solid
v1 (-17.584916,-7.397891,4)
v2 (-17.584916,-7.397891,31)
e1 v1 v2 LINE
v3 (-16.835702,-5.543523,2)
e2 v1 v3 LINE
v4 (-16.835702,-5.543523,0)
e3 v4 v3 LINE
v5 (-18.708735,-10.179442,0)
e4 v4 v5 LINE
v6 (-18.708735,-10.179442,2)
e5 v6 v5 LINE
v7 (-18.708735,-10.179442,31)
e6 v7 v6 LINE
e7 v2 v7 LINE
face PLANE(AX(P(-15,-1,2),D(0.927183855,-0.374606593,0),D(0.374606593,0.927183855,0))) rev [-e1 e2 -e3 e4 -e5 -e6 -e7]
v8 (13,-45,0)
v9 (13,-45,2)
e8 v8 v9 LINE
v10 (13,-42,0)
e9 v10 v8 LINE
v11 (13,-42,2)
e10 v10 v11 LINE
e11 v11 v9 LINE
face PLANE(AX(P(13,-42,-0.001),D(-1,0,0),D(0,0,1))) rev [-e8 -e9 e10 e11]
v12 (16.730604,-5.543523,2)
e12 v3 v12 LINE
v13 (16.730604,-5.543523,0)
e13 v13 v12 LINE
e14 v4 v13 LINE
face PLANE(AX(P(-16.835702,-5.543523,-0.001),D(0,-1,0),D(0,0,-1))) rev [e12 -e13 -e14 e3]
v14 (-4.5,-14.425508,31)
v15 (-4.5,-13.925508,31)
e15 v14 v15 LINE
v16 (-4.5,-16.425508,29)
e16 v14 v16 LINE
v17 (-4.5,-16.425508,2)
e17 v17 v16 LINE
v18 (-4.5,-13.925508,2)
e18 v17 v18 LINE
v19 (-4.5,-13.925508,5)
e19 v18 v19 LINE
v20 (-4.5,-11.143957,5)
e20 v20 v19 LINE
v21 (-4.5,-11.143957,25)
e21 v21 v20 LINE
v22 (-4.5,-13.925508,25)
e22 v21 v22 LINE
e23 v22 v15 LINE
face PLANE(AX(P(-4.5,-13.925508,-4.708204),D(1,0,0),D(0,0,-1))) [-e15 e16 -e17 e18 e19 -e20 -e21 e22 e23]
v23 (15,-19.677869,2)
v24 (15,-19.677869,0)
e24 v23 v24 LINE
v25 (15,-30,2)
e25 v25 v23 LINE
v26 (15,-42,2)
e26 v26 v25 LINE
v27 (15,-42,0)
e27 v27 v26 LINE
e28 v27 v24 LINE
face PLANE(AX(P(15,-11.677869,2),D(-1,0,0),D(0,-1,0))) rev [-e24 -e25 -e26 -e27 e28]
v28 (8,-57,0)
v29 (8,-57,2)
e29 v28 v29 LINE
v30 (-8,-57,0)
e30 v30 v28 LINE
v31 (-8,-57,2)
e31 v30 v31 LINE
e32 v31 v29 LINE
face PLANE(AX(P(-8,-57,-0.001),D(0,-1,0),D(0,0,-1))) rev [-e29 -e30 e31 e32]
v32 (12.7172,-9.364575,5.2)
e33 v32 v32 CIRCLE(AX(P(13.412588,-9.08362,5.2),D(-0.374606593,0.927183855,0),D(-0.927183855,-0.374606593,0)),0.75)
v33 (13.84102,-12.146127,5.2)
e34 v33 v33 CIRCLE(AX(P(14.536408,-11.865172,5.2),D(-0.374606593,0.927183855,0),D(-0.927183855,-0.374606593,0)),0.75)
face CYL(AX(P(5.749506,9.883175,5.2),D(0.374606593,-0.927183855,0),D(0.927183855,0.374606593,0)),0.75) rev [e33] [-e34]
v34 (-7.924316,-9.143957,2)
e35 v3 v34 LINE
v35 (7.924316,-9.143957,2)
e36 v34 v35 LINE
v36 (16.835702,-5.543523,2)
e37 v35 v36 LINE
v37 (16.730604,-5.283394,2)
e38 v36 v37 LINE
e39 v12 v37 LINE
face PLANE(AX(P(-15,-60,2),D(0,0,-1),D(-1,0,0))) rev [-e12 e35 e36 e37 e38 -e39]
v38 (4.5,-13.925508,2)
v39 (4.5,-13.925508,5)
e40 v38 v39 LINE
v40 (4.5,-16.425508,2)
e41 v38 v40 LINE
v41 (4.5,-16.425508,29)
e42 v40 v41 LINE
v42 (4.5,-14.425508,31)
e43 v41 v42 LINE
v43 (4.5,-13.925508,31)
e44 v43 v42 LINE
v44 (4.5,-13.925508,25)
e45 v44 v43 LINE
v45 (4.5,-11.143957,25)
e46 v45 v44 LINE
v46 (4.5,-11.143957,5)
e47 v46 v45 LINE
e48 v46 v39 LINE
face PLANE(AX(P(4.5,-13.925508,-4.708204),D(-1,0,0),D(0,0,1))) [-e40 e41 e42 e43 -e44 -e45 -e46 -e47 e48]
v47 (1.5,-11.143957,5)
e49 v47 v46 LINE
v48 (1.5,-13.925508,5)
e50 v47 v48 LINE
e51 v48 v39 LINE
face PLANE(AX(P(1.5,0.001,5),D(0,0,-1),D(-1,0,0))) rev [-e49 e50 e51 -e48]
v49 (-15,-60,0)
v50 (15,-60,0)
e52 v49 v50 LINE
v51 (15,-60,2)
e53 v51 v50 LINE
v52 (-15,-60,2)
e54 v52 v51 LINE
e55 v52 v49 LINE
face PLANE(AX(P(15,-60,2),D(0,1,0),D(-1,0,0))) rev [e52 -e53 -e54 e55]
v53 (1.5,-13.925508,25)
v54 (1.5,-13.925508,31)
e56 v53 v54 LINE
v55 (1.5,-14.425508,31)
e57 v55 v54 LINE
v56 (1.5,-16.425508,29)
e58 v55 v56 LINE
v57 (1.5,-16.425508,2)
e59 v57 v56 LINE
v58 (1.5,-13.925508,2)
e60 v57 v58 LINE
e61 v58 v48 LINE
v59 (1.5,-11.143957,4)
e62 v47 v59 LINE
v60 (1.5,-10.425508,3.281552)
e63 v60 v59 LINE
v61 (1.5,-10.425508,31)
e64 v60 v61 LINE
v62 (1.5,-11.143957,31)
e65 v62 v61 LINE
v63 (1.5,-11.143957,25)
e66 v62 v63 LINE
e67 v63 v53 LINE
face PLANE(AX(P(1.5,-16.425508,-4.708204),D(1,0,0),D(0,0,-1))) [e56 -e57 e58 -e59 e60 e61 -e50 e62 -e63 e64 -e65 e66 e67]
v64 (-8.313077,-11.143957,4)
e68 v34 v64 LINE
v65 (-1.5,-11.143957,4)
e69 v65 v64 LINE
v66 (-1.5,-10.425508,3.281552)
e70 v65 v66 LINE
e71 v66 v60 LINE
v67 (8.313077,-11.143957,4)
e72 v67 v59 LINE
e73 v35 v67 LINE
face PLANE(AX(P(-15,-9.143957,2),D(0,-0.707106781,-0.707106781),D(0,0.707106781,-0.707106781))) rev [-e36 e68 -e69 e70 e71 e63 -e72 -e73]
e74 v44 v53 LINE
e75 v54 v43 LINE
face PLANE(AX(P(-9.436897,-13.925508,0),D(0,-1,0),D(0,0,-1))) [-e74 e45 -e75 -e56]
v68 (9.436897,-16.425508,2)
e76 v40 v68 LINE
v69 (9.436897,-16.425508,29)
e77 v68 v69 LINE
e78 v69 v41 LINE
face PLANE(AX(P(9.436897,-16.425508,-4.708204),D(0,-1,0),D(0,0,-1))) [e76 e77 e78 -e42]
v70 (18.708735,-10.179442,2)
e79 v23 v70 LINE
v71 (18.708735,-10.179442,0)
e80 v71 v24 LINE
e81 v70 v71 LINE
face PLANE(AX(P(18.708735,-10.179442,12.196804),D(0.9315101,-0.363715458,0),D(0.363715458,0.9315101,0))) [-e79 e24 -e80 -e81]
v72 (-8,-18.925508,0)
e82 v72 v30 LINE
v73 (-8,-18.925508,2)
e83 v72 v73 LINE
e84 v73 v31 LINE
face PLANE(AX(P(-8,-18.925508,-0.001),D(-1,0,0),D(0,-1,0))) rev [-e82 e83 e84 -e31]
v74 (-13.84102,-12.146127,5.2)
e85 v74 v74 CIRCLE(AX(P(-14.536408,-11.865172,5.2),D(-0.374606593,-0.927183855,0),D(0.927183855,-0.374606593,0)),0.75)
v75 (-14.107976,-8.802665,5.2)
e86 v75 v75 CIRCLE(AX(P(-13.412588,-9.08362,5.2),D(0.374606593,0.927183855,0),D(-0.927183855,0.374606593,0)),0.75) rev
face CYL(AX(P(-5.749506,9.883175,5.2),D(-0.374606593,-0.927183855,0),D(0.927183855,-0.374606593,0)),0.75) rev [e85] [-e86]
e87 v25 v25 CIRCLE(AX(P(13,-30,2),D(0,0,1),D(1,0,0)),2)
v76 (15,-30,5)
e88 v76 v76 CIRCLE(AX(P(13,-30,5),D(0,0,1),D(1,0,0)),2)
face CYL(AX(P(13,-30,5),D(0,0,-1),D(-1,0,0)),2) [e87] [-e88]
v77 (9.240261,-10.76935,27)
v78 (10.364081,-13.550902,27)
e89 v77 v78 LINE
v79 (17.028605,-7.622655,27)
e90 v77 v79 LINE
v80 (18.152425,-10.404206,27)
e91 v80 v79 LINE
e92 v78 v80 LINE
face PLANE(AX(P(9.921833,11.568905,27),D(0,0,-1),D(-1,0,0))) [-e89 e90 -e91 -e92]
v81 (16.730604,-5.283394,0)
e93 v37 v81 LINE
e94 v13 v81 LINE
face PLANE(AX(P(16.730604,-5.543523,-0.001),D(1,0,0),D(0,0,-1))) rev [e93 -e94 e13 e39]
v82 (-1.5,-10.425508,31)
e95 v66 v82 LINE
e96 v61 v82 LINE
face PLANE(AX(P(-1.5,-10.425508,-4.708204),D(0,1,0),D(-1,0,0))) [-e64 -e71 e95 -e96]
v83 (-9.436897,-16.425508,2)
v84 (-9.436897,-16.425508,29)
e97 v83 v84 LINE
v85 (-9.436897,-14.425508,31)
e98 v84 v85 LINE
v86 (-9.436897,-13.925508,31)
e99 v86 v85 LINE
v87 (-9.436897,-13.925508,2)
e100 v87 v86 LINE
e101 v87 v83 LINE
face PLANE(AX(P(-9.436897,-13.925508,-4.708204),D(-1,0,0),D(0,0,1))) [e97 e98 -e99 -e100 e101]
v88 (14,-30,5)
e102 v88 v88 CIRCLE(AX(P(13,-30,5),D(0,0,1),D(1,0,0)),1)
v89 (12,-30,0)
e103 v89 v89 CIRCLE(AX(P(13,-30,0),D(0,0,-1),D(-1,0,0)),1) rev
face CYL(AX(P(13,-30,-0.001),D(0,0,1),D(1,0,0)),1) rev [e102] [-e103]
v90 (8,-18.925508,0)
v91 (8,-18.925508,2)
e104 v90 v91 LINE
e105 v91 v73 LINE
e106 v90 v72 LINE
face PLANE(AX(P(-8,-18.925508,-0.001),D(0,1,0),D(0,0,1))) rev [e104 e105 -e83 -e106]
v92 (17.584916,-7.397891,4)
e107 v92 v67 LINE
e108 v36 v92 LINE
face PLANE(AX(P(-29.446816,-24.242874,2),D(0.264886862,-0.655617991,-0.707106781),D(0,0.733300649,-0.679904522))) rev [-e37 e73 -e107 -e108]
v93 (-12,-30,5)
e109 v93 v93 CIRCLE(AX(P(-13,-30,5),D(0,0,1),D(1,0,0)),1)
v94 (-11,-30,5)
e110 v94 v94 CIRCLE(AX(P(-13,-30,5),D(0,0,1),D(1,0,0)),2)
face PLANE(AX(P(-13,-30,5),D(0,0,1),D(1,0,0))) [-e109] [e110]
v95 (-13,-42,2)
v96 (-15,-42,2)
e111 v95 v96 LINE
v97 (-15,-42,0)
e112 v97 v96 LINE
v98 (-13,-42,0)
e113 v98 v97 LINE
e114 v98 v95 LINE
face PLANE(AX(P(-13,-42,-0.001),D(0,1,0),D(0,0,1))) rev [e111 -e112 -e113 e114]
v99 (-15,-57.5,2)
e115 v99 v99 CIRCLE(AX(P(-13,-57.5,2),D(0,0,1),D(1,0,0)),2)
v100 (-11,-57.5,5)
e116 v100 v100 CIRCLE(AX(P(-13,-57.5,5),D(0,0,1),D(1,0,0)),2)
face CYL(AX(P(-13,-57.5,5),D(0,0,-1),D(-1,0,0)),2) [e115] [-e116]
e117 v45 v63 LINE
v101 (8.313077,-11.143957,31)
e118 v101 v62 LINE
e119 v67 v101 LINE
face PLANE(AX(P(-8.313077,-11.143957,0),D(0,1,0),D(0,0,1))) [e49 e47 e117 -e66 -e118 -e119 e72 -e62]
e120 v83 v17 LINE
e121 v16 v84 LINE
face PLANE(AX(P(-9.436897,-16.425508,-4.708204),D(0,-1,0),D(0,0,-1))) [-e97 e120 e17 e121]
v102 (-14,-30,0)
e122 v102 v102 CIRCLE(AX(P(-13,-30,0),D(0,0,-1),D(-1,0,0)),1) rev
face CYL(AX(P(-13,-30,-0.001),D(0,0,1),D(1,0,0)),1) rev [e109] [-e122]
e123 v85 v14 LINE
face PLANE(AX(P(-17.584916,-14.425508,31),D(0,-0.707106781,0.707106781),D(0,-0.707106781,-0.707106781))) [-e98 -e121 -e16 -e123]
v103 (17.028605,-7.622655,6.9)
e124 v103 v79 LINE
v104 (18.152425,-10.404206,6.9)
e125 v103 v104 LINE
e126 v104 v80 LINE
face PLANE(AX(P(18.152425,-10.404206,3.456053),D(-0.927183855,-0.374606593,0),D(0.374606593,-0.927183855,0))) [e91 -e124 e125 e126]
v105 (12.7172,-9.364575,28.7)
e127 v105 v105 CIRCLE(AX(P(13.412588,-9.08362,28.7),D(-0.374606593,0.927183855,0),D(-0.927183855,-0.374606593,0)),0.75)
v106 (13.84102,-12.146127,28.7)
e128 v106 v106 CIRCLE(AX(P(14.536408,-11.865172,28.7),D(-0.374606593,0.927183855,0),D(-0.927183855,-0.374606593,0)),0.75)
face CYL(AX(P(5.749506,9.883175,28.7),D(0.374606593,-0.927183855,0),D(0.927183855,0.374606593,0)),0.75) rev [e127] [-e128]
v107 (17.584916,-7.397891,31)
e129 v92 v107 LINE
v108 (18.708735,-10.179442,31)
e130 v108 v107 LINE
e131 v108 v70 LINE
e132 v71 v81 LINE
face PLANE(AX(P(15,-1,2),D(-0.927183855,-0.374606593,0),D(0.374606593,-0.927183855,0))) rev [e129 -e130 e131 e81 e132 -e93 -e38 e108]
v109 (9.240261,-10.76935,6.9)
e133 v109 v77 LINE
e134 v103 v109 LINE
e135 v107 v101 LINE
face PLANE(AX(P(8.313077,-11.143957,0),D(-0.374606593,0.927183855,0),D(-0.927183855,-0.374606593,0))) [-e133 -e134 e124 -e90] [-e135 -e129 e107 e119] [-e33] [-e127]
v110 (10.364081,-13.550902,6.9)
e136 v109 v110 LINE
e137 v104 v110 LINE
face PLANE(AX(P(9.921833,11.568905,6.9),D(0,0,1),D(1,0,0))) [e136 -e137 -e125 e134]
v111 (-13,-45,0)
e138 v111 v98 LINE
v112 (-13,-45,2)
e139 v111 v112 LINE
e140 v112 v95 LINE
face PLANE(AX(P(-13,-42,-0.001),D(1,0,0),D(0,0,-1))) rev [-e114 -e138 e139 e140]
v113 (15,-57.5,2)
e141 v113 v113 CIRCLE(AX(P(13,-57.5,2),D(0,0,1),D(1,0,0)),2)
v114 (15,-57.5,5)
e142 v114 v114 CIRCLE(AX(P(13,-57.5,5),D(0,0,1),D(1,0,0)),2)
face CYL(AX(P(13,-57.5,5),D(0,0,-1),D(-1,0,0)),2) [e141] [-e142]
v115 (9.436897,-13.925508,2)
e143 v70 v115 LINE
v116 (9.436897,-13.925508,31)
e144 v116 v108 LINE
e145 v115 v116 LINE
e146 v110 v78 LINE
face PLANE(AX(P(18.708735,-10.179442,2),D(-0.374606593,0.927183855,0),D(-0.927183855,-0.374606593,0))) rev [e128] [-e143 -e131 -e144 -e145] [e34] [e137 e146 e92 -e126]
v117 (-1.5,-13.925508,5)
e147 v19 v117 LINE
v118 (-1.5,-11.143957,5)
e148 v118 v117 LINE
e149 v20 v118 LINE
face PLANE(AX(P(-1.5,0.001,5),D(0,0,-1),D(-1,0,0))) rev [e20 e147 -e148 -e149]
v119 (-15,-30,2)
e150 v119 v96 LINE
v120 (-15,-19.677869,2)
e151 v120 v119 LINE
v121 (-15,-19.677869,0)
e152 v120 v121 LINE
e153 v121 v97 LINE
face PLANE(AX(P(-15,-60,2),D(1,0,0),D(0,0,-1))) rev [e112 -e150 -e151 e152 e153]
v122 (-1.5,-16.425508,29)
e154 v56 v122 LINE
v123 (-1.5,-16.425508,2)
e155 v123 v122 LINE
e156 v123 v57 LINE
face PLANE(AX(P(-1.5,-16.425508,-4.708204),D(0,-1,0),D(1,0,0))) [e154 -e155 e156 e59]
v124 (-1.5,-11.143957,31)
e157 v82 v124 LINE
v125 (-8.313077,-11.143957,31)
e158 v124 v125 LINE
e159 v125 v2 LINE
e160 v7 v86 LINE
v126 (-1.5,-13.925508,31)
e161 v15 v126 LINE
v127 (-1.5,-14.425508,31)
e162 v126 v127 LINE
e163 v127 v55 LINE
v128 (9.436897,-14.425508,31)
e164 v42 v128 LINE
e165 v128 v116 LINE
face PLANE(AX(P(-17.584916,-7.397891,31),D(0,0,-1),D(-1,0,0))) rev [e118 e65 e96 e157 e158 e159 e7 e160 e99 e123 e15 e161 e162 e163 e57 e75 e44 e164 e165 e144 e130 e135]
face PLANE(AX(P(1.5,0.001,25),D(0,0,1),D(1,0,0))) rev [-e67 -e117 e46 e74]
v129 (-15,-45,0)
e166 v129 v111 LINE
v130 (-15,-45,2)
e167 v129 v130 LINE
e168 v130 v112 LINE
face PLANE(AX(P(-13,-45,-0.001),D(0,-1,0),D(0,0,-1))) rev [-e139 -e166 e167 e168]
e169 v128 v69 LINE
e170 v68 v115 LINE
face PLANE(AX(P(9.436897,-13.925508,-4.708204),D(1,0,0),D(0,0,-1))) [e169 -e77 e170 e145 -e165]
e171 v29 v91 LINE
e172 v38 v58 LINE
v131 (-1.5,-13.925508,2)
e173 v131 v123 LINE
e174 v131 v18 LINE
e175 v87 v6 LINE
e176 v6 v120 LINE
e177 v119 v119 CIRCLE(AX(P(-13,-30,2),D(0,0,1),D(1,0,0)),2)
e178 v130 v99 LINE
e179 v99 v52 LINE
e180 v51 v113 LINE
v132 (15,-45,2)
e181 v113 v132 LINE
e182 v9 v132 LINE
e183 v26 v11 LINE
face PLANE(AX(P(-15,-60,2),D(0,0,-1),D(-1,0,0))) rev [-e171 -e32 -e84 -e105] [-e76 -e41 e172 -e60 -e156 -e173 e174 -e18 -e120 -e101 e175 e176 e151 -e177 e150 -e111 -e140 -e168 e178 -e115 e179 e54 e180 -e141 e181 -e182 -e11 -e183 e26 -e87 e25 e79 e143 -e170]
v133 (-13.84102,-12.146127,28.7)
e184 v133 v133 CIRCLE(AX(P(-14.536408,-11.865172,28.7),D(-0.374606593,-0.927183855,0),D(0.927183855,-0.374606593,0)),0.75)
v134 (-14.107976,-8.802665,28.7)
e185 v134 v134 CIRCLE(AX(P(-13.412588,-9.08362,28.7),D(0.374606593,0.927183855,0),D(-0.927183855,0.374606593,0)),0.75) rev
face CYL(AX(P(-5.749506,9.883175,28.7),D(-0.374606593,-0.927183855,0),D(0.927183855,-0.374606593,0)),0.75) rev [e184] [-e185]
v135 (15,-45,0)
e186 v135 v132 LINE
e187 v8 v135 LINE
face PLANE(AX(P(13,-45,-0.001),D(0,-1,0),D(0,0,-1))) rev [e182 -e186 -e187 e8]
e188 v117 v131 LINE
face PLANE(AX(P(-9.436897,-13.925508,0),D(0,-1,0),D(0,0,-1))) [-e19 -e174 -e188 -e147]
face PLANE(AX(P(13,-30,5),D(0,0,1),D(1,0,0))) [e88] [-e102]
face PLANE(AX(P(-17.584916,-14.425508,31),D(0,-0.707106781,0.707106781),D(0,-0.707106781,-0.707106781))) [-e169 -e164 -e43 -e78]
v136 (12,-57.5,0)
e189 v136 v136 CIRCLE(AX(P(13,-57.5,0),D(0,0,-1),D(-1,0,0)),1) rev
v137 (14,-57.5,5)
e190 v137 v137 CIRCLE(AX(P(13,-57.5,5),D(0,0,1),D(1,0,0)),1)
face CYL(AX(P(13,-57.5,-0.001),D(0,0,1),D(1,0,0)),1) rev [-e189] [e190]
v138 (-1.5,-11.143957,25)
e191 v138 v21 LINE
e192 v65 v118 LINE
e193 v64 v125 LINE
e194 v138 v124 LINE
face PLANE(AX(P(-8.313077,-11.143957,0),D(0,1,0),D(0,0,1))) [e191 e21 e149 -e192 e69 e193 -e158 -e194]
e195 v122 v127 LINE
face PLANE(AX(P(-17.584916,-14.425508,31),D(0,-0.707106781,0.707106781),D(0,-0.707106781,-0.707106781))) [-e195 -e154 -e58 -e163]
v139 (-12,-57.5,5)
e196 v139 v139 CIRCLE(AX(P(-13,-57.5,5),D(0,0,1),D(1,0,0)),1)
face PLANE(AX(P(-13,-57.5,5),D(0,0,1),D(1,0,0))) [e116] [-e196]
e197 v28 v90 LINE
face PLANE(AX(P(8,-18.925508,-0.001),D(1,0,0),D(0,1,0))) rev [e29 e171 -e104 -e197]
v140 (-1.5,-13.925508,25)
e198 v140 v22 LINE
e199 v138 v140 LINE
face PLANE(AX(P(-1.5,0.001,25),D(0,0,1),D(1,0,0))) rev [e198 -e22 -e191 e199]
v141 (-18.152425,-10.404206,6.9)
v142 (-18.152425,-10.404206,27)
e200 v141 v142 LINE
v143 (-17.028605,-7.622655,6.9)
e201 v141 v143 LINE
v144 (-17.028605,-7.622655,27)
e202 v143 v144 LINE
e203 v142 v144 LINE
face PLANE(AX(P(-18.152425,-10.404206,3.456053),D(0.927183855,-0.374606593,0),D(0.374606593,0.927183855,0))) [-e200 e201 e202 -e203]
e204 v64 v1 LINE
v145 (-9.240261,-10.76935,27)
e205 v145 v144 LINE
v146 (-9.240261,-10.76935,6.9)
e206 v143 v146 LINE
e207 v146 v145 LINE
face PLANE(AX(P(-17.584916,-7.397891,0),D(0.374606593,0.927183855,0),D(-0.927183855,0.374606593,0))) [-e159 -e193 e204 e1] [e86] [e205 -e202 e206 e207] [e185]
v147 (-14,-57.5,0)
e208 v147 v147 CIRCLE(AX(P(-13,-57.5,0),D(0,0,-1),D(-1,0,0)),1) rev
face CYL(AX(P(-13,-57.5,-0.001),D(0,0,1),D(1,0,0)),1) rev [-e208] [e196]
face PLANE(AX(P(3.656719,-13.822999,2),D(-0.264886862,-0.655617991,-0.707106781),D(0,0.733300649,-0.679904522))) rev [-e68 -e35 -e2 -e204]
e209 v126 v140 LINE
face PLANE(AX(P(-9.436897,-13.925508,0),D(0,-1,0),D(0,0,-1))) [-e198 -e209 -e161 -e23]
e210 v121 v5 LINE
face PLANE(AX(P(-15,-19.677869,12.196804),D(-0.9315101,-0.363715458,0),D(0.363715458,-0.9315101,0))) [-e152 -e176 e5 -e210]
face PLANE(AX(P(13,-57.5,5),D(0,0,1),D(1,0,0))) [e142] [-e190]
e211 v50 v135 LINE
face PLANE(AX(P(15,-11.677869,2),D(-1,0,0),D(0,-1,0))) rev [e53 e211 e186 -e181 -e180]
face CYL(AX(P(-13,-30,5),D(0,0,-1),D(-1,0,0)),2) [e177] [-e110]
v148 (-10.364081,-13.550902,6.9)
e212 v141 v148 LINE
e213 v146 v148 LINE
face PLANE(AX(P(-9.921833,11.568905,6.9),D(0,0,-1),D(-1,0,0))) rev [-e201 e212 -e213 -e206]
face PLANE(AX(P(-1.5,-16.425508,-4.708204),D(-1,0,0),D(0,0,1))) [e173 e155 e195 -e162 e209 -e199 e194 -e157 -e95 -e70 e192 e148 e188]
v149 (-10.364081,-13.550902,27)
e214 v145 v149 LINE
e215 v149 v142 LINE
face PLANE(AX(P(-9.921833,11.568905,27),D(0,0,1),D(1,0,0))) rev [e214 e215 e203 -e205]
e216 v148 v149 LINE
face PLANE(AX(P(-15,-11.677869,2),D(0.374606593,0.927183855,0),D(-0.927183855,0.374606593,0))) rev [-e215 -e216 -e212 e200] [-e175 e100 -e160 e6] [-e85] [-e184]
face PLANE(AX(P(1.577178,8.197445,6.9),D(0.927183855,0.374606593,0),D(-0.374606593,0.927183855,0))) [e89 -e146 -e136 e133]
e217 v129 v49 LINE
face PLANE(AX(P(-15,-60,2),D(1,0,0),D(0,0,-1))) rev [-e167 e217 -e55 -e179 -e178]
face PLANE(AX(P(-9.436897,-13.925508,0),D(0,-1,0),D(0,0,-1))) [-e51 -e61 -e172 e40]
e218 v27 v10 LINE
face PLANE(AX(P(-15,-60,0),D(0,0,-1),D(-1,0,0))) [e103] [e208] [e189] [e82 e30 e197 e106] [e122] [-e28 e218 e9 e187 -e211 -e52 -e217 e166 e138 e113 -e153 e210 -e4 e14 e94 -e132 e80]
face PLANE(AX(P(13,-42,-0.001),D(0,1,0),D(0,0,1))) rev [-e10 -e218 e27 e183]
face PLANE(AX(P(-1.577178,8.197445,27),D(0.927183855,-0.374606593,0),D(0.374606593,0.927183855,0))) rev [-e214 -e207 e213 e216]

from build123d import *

# Parameters (mm, degrees)
EXTRUDE_1_DEPTH      = 2
EXTRUDE_2_DEPTH      = 29
EXTRUDE_2_DEPTH_BACK = 2
CUT_EXTRUDE_5_REACH  = 60.965
SKETCH_3_R           = 0.75
SKETCH_3_W           = 9
SKETCH_3_H           = 20.1
CUT_EXTRUDE_7_REACH  = 61.851
SKETCH_12_R          = 0.75
SKETCH_12_W          = 9
SKETCH_12_H          = 20.1
CUT_EXTRUDE_8_REACH  = 71.217
SKETCH_13_R          = 1
SKETCH_13_W          = 16
SKETCH_13_H          = 38.074491789
SKETCH_13_W_2        = 2
SKETCH_13_H_2        = 3
CHAMFER_4_SIZE       = 1
CHAMFER_5_SIZE       = 2
EXTRUDE_START        = -29
SKETCH_14_W          = 3
SKETCH_14_H          = 6
SKETCH_14_W_2        = 4.936896873
SKETCH_14_H_2        = 2.5
EXTRUDE_8_DEPTH      = 29
CHAMFER_6_SIZE       = 2
EXTRUDE_START_2      = 3
SKETCH_15_R          = 2
SKETCH_15_R_2        = 1
EXTRUDE_9_DEPTH      = 3
CUT_EXTRUDE_9_REACH  = 60.599
SKETCH_16_W          = 3
SKETCH_16_H          = 20
EXTRUDE_10_DEPTH     = 2
EXTRUDE_11_DEPTH     = 24.1
CUT_EXTRUDE_11_REACH = 71.217
SKETCH_20_W          = 33.566306147
SKETCH_20_H          = 6.687524296


with BuildPart() as part:
    # 草圖1 → 填料-伸長1 (new body)
    with BuildSketch(Plane.XY):
        Polygon((-15, 0), (15, 0), (15, -1), (18.708735418, -10.179442277), (15, -11.67786865), (15, -60), (-15, -60), (-15, -11.67786865), (-18.708735418, -10.179442277), (-15, -1), align=None)
    extrude(amount=EXTRUDE_1_DEPTH)

    # 草圖2 → 填料-伸長2 (add, two sides: drawn at the far end of the back side and taken through both)
    with BuildSketch(Plane.XY.offset(2).offset(-EXTRUDE_2_DEPTH_BACK)):
        Polygon((-18.708735418, -10.179442277), (-9.436896873, -13.925508211), (9.436896873, -13.925508211), (18.708735418, -10.179442277), (17.584915638, -7.397890713), (8.313077092, -11.143956647), (-8.313077092, -11.143956647), (-17.584915638, -7.397890713), align=None)
    extrude(amount=EXTRUDE_2_DEPTH + EXTRUDE_2_DEPTH_BACK)

    # 草圖3 → 除料-伸長5 (cut, up to next)
    with BuildSketch(Plane(origin=(4.914686172, -15.752599933, 0), x_dir=(0.9271838545667884, 0.37460659341590963, 0), z_dir=(-0.37460659341590963, 0.9271838545667884, 0)), mode=Mode.PRIVATE) as cut_extrude_5_sk1:
        with Locations(Location((10.377361354, -5.2, 0), (0, 0, 180))):
            Circle(SKETCH_3_R)
    cut_extrude_5_tool1 = extrude(cut_extrude_5_sk1.sketch, amount=CUT_EXTRUDE_5_REACH, mode=Mode.PRIVATE) & part.part
    # 草圖3 → 除料-伸長5 (cut, up to next)
    with BuildSketch(Plane(origin=(4.914686172, -15.752599933, 0), x_dir=(0.9271838545667884, 0.37460659341590963, 0), z_dir=(-0.37460659341590963, 0.9271838545667884, 0)), mode=Mode.PRIVATE) as cut_extrude_5_sk2:
        with Locations(Location((10.377361354, -28.7, 0), (0, 0, 180))):
            Circle(SKETCH_3_R)
    cut_extrude_5_tool2 = extrude(cut_extrude_5_sk2.sketch, amount=CUT_EXTRUDE_5_REACH, mode=Mode.PRIVATE) & part.part
    # 草圖3 → 除料-伸長5 (cut, up to next)
    with BuildSketch(Plane(origin=(4.914686172, -15.752599933, 0), x_dir=(0.9271838545667884, 0.37460659341590963, 0), z_dir=(-0.37460659341590963, 0.9271838545667884, 0)), mode=Mode.PRIVATE) as cut_extrude_5_sk3:
        with Locations((10.377361354, -16.95)):
            Rectangle(SKETCH_3_W, SKETCH_3_H)
    cut_extrude_5_tool3 = extrude(cut_extrude_5_sk3.sketch, amount=CUT_EXTRUDE_5_REACH, mode=Mode.PRIVATE) & part.part
    add(cut_extrude_5_tool1.solids().sort_by_distance((14.536408, -11.865172, 5.2))[0], mode=Mode.SUBTRACT)
    add(cut_extrude_5_tool2.solids().sort_by_distance((14.536408, -11.865172, 28.7))[0], mode=Mode.SUBTRACT)
    add(cut_extrude_5_tool3.solids().sort_by_distance((14.536408, -11.865172, 16.95))[0], mode=Mode.SUBTRACT)

    # 草圖12 → 除料-伸長7 (cut, up to next)
    with BuildSketch(Plane(origin=(-6.161016101, -15.249049955, 0), x_dir=(0.9271838545667846, -0.3746065934159192, 0), z_dir=(-0.3746065934159192, -0.9271838545667846, 0)), mode=Mode.PRIVATE) as cut_extrude_7_sk1:
        with Locations((-9.033151225, 28.7)):
            Circle(SKETCH_12_R)
    cut_extrude_7_tool1 = extrude(cut_extrude_7_sk1.sketch, amount=-CUT_EXTRUDE_7_REACH, mode=Mode.PRIVATE) & part.part
    # 草圖12 → 除料-伸長7 (cut, up to next)
    with BuildSketch(Plane(origin=(-6.161016101, -15.249049955, 0), x_dir=(0.9271838545667846, -0.3746065934159192, 0), z_dir=(-0.3746065934159192, -0.9271838545667846, 0)), mode=Mode.PRIVATE) as cut_extrude_7_sk2:
        with Locations((-9.033151225, 5.2)):
            Circle(SKETCH_12_R)
    cut_extrude_7_tool2 = extrude(cut_extrude_7_sk2.sketch, amount=-CUT_EXTRUDE_7_REACH, mode=Mode.PRIVATE) & part.part
    # 草圖12 → 除料-伸長7 (cut, up to next)
    with BuildSketch(Plane(origin=(-6.161016101, -15.249049955, 0), x_dir=(0.9271838545667846, -0.3746065934159192, 0), z_dir=(-0.3746065934159192, -0.9271838545667846, 0)), mode=Mode.PRIVATE) as cut_extrude_7_sk3:
        with Locations((-9.033151225, 16.95)):
            Rectangle(SKETCH_12_W, SKETCH_12_H)
    cut_extrude_7_tool3 = extrude(cut_extrude_7_sk3.sketch, amount=-CUT_EXTRUDE_7_REACH, mode=Mode.PRIVATE) & part.part
    add(cut_extrude_7_tool1.solids().sort_by_distance((-14.536408, -11.865172, 28.7))[0], mode=Mode.SUBTRACT)
    add(cut_extrude_7_tool2.solids().sort_by_distance((-14.536408, -11.865172, 5.2))[0], mode=Mode.SUBTRACT)
    add(cut_extrude_7_tool3.solids().sort_by_distance((-14.536408, -11.865172, 16.95))[0], mode=Mode.SUBTRACT)

    # 草圖13 → 除料-伸長8 (cut, up to next)
    with BuildSketch(Plane.XY.offset(2), mode=Mode.PRIVATE) as cut_extrude_8_sk1:
        with Locations((-13, -30)):
            Circle(SKETCH_13_R)
    cut_extrude_8_tool1 = extrude(cut_extrude_8_sk1.sketch, amount=-CUT_EXTRUDE_8_REACH, mode=Mode.PRIVATE) & part.part
    # 草圖13 → 除料-伸長8 (cut, up to next)
    with BuildSketch(Plane.XY.offset(2), mode=Mode.PRIVATE) as cut_extrude_8_sk2:
        with Locations((13, -30)):
            Circle(SKETCH_13_R)
    cut_extrude_8_tool2 = extrude(cut_extrude_8_sk2.sketch, amount=-CUT_EXTRUDE_8_REACH, mode=Mode.PRIVATE) & part.part
    # 草圖13 → 除料-伸長8 (cut, up to next)
    with BuildSketch(Plane.XY.offset(2), mode=Mode.PRIVATE) as cut_extrude_8_sk3:
        with Locations((-13, -57.5)):
            Circle(SKETCH_13_R)
    cut_extrude_8_tool3 = extrude(cut_extrude_8_sk3.sketch, amount=-CUT_EXTRUDE_8_REACH, mode=Mode.PRIVATE) & part.part
    # 草圖13 → 除料-伸長8 (cut, up to next)
    with BuildSketch(Plane.XY.offset(2), mode=Mode.PRIVATE) as cut_extrude_8_sk4:
        with Locations((13, -57.5)):
            Circle(SKETCH_13_R)
    cut_extrude_8_tool4 = extrude(cut_extrude_8_sk4.sketch, amount=-CUT_EXTRUDE_8_REACH, mode=Mode.PRIVATE) & part.part
    # 草圖13 → 除料-伸長8 (cut, up to next)
    with BuildSketch(Plane.XY.offset(2), mode=Mode.PRIVATE) as cut_extrude_8_sk5:
        with Locations((0, -37.962754105)):
            Rectangle(SKETCH_13_W, SKETCH_13_H)
    cut_extrude_8_tool5 = extrude(cut_extrude_8_sk5.sketch, amount=-CUT_EXTRUDE_8_REACH, mode=Mode.PRIVATE) & part.part
    # 草圖13 → 除料-伸長8 (cut, up to next)
    with BuildSketch(Plane.XY.offset(2), mode=Mode.PRIVATE) as cut_extrude_8_sk6:
        with Locations((-14, -43.5)):
            Rectangle(SKETCH_13_W_2, SKETCH_13_H_2)
    cut_extrude_8_tool6 = extrude(cut_extrude_8_sk6.sketch, amount=-CUT_EXTRUDE_8_REACH, mode=Mode.PRIVATE) & part.part
    # 草圖13 → 除料-伸長8 (cut, up to next)
    with BuildSketch(Plane.XY.offset(2), mode=Mode.PRIVATE) as cut_extrude_8_sk7:
        with Locations((14, -43.5)):
            Rectangle(SKETCH_13_W_2, SKETCH_13_H_2)
    cut_extrude_8_tool7 = extrude(cut_extrude_8_sk7.sketch, amount=-CUT_EXTRUDE_8_REACH, mode=Mode.PRIVATE) & part.part
    add(cut_extrude_8_tool1.solids().sort_by_distance((-13, -30, 2))[0], mode=Mode.SUBTRACT)
    add(cut_extrude_8_tool2.solids().sort_by_distance((13, -30, 2))[0], mode=Mode.SUBTRACT)
    add(cut_extrude_8_tool3.solids().sort_by_distance((-13, -57.5, 2))[0], mode=Mode.SUBTRACT)
    add(cut_extrude_8_tool4.solids().sort_by_distance((13, -57.5, 2))[0], mode=Mode.SUBTRACT)
    add(cut_extrude_8_tool5.solids().sort_by_distance((0, -37.962754, 2))[0], mode=Mode.SUBTRACT)
    add(cut_extrude_8_tool6.solids().sort_by_distance((-14, -43.5, 2))[0], mode=Mode.SUBTRACT)
    add(cut_extrude_8_tool7.solids().sort_by_distance((14, -43.5, 2))[0], mode=Mode.SUBTRACT)

    # 導角4
    chamfer_4_edges = [part.edges().sort_by_distance(p)[0] for p in [
        (-15, 0, 1),
        (15, 0, 1),
    ]]
    chamfer(chamfer_4_edges, length=CHAMFER_4_SIZE - 0.0001)  # a hair under: the kernel refuses the full size

    # 導角5
    chamfer_5_edges = [part.edges().sort_by_distance(p)[0] for p in [
        (-12.948996365, -9.27092368, 2),
        (0, -11.143956647, 2),
        (12.948996365, -9.27092368, 2),
    ]]
    chamfer(chamfer_5_edges, length=CHAMFER_5_SIZE)

    # 草圖14 → 填料-伸長8 (add)
    with BuildSketch(Plane.XY.offset(31).offset(EXTRUDE_START)):
        with Locations((0, -13.425508211)):
            Rectangle(SKETCH_14_W, SKETCH_14_H)
        with Locations((-6.968448437, -15.175508211)):
            Rectangle(SKETCH_14_W_2, SKETCH_14_H_2)
        with Locations((6.968448437, -15.175508211)):
            Rectangle(SKETCH_14_W_2, SKETCH_14_H_2)
    extrude(amount=EXTRUDE_8_DEPTH)

    # 導角6
    chamfer_6_edges = [part.edges().sort_by_distance(p)[0] for p in [
        (0, -16.425508211, 31),
        (-6.968448436, -16.425508211, 31),
        (6.968448436, -16.425508211, 31),
    ]]
    chamfer(chamfer_6_edges, length=CHAMFER_6_SIZE)

    # 草圖15 → 填料-伸長9 (add)
    # profile 1 of 4: a face of its own
    with BuildSketch(Plane.XY.offset(2).offset(EXTRUDE_START_2)):
        with Locations(Location((-13, -30, 0), (0, 0, 180))):
            Circle(SKETCH_15_R)
        with Locations((-13, -30)):
            Circle(SKETCH_15_R_2, mode=Mode.SUBTRACT)
    # profile 2 of 4: a face of its own
    with BuildSketch(Plane.XY.offset(2).offset(EXTRUDE_START_2)):
        with Locations((13, -30)):
            Circle(SKETCH_15_R)
        with Locations((13, -30)):
            Circle(SKETCH_15_R_2, mode=Mode.SUBTRACT)
    # profile 3 of 4: a face of its own
    with BuildSketch(Plane.XY.offset(2).offset(EXTRUDE_START_2)):
        with Locations((13, -57.5)):
            Circle(SKETCH_15_R)
        with Locations((13, -57.5)):
            Circle(SKETCH_15_R_2, mode=Mode.SUBTRACT)
    # profile 4 of 4: a face of its own
    with BuildSketch(Plane.XY.offset(2).offset(EXTRUDE_START_2)):
        with Locations(Location((-13, -57.5, 0), (0, 0, 180))):
            Circle(SKETCH_15_R)
        with Locations((-13, -57.5)):
            Circle(SKETCH_15_R_2, mode=Mode.SUBTRACT)
    extrude(amount=-EXTRUDE_9_DEPTH)

    # 草圖16 → 除料-伸長9 (cut, up to next)
    with BuildSketch(Plane.XZ.offset(13.925508211), mode=Mode.PRIVATE) as cut_extrude_9_sk1:
        with Locations((-3, 15)):
            Rectangle(SKETCH_16_W, SKETCH_16_H)
    cut_extrude_9_tool1 = extrude(cut_extrude_9_sk1.sketch, amount=-CUT_EXTRUDE_9_REACH, mode=Mode.PRIVATE) & part.part
    # 草圖16 → 除料-伸長9 (cut, up to next)
    with BuildSketch(Plane.XZ.offset(13.925508211), mode=Mode.PRIVATE) as cut_extrude_9_sk2:
        with Locations((3, 15)):
            Rectangle(SKETCH_16_W, SKETCH_16_H)
    cut_extrude_9_tool2 = extrude(cut_extrude_9_sk2.sketch, amount=-CUT_EXTRUDE_9_REACH, mode=Mode.PRIVATE) & part.part
    add(cut_extrude_9_tool1.solids().sort_by_distance((-3, -13.925508, 15))[0], mode=Mode.SUBTRACT)
    add(cut_extrude_9_tool2.solids().sort_by_distance((3, -13.925508, 15))[0], mode=Mode.SUBTRACT)

    # 草圖17 → 填料-伸長10 (add)
    with BuildSketch(Plane(origin=(0, 0, 0), x_dir=(-1, 0, 0), z_dir=(0, 0, -1))):
        Polygon((-18.708735418, -10.179442277), (-15, -19.67786865), (-15, -11.67786865), align=None)
        Polygon((18.708735418, -10.179442277), (15, -11.67786865), (15, -19.67786865), align=None)
    extrude(amount=-EXTRUDE_10_DEPTH)

    # 草圖18 → 填料-伸長11 (add)
    with BuildSketch(Plane.XY.offset(31)):
        Polygon((-17.584915638, -7.397890713), (-18.708735418, -10.179442277), (-18.152425106, -10.404206233), (-17.028605325, -7.622654669), align=None)
        Polygon((17.584915638, -7.397890713), (18.708735418, -10.179442277), (18.152425106, -10.404206233), (17.028605325, -7.622654669), align=None)
    extrude(amount=-EXTRUDE_11_DEPTH)

    # 草圖20 → 除料-伸長11 (cut, up to next)
    with BuildSketch(Plane.XY.offset(2), mode=Mode.PRIVATE) as cut_extrude_11_sk1:
        with Locations((-0.052549378, -2.199760856)):
            Rectangle(SKETCH_20_W, SKETCH_20_H)
    cut_extrude_11_tool1 = extrude(cut_extrude_11_sk1.sketch, amount=-CUT_EXTRUDE_11_REACH, mode=Mode.PRIVATE) & part.part
    add(cut_extrude_11_tool1.solids().sort_by_distance((-0.052549, -2.199761, 2))[0], mode=Mode.SUBTRACT)


solid = part.part
